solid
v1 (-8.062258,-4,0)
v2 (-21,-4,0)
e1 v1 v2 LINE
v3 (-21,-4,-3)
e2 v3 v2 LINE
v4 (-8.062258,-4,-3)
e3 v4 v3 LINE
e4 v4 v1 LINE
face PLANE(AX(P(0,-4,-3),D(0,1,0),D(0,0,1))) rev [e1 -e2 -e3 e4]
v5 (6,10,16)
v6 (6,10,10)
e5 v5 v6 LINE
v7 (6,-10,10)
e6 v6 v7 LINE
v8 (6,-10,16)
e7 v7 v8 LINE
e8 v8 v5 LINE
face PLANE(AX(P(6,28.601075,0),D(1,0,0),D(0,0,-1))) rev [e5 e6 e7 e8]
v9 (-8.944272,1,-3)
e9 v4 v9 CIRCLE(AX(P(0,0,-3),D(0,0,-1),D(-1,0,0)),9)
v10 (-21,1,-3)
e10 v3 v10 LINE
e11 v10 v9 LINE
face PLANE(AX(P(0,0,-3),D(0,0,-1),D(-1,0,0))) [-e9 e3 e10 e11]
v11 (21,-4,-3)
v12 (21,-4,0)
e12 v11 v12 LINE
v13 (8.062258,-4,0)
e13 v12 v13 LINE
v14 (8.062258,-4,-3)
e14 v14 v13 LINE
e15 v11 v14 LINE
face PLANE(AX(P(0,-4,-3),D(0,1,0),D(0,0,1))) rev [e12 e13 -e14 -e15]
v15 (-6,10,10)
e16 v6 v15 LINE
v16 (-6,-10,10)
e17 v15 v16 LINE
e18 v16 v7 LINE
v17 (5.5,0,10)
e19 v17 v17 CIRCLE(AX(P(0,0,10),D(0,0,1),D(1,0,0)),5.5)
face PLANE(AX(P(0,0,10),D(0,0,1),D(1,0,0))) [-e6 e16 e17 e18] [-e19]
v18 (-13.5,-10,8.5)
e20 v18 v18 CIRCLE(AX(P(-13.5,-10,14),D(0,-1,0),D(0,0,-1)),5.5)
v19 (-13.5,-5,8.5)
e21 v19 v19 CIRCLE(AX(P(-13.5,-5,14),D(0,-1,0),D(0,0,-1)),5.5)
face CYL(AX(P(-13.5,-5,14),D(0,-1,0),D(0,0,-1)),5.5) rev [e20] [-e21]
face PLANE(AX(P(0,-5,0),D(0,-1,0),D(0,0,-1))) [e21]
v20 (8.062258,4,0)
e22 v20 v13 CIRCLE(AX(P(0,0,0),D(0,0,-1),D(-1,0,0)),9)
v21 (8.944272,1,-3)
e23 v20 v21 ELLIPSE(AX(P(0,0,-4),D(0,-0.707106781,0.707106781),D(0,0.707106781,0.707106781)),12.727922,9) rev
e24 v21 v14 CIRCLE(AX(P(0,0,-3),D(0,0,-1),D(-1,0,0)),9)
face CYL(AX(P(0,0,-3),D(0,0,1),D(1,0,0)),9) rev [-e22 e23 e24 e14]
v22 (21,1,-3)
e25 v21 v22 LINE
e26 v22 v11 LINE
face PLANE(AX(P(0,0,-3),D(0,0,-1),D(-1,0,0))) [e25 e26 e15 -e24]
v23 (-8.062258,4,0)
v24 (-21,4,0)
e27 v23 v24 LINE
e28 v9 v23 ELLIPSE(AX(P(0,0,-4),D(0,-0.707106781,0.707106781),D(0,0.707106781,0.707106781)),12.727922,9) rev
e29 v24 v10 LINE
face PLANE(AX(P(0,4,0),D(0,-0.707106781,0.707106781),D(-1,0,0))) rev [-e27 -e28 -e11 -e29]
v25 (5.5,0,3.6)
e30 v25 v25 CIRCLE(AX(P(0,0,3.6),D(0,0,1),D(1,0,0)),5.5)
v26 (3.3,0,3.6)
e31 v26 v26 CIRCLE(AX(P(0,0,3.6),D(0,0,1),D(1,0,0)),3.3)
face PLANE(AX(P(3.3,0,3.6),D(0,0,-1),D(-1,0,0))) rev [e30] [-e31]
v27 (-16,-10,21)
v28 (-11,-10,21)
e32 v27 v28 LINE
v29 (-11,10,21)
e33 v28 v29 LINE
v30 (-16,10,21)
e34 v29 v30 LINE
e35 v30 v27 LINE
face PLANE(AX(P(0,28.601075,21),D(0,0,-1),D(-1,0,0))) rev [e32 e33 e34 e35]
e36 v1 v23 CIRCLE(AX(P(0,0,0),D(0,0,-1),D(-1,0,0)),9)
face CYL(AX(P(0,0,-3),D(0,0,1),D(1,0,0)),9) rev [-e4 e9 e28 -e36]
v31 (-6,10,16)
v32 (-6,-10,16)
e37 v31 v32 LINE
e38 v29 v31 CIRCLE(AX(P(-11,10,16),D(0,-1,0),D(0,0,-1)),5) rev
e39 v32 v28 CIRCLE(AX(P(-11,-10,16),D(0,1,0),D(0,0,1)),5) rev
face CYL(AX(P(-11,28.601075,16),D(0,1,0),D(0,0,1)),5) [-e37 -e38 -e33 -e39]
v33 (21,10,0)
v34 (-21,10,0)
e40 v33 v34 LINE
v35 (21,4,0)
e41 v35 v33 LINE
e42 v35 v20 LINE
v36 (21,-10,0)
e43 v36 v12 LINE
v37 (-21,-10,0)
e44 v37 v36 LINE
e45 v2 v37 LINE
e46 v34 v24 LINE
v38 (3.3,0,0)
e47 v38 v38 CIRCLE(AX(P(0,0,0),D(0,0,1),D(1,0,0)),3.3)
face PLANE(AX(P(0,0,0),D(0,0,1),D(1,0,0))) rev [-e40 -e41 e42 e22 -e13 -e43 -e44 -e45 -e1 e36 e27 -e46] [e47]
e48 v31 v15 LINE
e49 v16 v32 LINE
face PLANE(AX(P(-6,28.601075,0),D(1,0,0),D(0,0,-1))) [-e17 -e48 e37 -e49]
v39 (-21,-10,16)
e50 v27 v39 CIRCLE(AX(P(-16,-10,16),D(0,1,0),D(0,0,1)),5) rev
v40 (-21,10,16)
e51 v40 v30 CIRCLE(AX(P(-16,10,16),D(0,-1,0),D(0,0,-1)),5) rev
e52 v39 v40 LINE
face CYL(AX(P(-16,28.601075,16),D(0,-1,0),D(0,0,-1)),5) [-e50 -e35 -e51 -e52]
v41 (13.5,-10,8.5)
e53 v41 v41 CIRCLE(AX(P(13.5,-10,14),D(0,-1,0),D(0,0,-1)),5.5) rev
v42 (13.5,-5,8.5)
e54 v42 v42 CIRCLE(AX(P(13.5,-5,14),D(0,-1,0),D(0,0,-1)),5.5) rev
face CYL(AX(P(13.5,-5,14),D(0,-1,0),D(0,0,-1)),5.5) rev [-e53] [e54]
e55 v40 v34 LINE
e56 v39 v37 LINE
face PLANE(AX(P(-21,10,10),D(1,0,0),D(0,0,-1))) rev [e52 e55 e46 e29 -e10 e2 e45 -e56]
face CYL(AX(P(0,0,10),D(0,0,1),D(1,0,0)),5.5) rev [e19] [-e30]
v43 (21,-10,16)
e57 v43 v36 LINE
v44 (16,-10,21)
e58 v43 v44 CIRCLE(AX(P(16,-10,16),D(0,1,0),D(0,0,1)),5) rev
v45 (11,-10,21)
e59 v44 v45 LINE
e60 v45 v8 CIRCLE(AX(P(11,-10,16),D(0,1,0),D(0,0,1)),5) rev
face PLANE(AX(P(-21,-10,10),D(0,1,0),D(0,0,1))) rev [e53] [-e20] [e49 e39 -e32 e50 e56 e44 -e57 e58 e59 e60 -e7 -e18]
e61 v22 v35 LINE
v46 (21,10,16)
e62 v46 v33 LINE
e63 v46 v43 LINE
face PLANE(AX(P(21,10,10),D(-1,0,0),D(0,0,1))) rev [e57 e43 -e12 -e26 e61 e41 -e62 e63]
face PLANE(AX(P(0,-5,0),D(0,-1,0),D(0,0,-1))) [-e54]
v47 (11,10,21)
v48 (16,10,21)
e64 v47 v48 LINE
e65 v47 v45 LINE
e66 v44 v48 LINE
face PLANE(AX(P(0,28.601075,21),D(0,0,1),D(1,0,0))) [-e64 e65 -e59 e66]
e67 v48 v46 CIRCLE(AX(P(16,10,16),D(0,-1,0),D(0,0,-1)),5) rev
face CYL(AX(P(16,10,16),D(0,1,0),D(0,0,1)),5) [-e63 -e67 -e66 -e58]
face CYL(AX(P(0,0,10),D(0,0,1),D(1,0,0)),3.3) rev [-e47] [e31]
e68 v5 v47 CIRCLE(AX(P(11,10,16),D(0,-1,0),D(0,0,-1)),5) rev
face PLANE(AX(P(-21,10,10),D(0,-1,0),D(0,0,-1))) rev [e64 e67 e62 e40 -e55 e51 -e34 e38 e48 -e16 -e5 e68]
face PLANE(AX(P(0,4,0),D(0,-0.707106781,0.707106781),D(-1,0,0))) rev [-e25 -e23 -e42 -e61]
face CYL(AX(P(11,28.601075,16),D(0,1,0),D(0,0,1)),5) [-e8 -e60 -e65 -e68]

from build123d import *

# Parameters (mm, degrees)
BASE_SKETCH_W           = 42
BASE_SKETCH_H           = 20
BASE_DEPTH              = 10
MAGNET_TOWER_SKETCH_W   = 15
MAGNET_TOWER_SKETCH_H   = 11
MAGNET_TOWER_DEPTH      = 20
MAGNET_HOLES_SKETCH_R   = 5.5
MAGNET_HOLES_DEPTH      = 5
MOUNT_SCREW_D           = 6.6
MOUNT_SCREW_CBORE_D     = 11
MOUNT_SCREW_CBORE_DEPTH = 6.4
ROUNDING_R              = 5
PROFILE_CLIP_DEPTH      = 3
PROFILE_CLIP_ANGLE_SIZE = 3


with BuildPart() as part:
    # Base sketch → Base (new body)
    with BuildSketch(Plane.XY):
        Rectangle(BASE_SKETCH_W, BASE_SKETCH_H)
    extrude(amount=BASE_DEPTH)

    # Magnet tower sketch → Magnet tower (add)
    with BuildSketch(Plane.XZ.offset(10)):
        with Locations((-13.5, 15.5)):
            Rectangle(MAGNET_TOWER_SKETCH_W, MAGNET_TOWER_SKETCH_H)
        with Locations((13.5, 15.5)):
            Rectangle(MAGNET_TOWER_SKETCH_W, MAGNET_TOWER_SKETCH_H)
    extrude(amount=-MAGNET_TOWER_DEPTH)

    # Magnet holes sketch → Magnet holes (cut)
    with BuildSketch(Plane.XZ.offset(10)):
        with Locations(Location((-13.5, 14, 0), (0, 0, 270))):
            Circle(MAGNET_HOLES_SKETCH_R)
        with Locations(Location((13.5, 14, 0), (0, 0, 270))):
            Circle(MAGNET_HOLES_SKETCH_R)
    extrude(amount=-MAGNET_HOLES_DEPTH, mode=Mode.SUBTRACT)

    # Mount screw (through all)
    with Locations(Plane.XY.offset(10)):
        with Locations((0, 0)):
            CounterBoreHole(MOUNT_SCREW_D / 2, MOUNT_SCREW_CBORE_D / 2, MOUNT_SCREW_CBORE_DEPTH)

    # Rounding
    rounding_edges = [part.edges().sort_by_distance(p)[0] for p in [
        (-21, 0, 21),
        (-6, 0, 21),
        (21, 0, 21),
        (6, 0, 21),
    ]]
    fillet(rounding_edges, radius=ROUNDING_R)

    # Profile clip sketch → Profile clip (add)
    with BuildSketch(Plane(origin=(0, 0, 0), x_dir=(-1, 0, 0), z_dir=(0, 0, -1))):
        with BuildLine():
            Line((-8.062257748, 4), (-21, 4))
            Line((-21, 4), (-21, -4))
            Line((-21, -4), (-8.062257748, -4))
            ThreePointArc((-8.062257748, -4), (-9, 0), (-8.062257748, 4))
        make_face()
        with BuildLine():
            Line((21, 4), (8.062257748, 4))
            ThreePointArc((8.062257748, 4), (8.762428879, 2.054224947), (9, 0))
            ThreePointArc((9, 0), (8.762428879, -2.054224947), (8.062257748, -4))
            Line((8.062257748, -4), (21, -4))
            Line((21, -4), (21, 4))
        make_face()
    extrude(amount=PROFILE_CLIP_DEPTH)

    # Profile clip angle
    profile_clip_angle_edges = [part.edges().sort_by_distance(p)[0] for p in [
        (-14.531128874, 4, -3),
        (14.531128874, 4, -3),
    ]]
    chamfer(profile_clip_angle_edges, length=PROFILE_CLIP_ANGLE_SIZE - 0.0001)  # a hair under: the kernel refuses the full size


solid = part.part
